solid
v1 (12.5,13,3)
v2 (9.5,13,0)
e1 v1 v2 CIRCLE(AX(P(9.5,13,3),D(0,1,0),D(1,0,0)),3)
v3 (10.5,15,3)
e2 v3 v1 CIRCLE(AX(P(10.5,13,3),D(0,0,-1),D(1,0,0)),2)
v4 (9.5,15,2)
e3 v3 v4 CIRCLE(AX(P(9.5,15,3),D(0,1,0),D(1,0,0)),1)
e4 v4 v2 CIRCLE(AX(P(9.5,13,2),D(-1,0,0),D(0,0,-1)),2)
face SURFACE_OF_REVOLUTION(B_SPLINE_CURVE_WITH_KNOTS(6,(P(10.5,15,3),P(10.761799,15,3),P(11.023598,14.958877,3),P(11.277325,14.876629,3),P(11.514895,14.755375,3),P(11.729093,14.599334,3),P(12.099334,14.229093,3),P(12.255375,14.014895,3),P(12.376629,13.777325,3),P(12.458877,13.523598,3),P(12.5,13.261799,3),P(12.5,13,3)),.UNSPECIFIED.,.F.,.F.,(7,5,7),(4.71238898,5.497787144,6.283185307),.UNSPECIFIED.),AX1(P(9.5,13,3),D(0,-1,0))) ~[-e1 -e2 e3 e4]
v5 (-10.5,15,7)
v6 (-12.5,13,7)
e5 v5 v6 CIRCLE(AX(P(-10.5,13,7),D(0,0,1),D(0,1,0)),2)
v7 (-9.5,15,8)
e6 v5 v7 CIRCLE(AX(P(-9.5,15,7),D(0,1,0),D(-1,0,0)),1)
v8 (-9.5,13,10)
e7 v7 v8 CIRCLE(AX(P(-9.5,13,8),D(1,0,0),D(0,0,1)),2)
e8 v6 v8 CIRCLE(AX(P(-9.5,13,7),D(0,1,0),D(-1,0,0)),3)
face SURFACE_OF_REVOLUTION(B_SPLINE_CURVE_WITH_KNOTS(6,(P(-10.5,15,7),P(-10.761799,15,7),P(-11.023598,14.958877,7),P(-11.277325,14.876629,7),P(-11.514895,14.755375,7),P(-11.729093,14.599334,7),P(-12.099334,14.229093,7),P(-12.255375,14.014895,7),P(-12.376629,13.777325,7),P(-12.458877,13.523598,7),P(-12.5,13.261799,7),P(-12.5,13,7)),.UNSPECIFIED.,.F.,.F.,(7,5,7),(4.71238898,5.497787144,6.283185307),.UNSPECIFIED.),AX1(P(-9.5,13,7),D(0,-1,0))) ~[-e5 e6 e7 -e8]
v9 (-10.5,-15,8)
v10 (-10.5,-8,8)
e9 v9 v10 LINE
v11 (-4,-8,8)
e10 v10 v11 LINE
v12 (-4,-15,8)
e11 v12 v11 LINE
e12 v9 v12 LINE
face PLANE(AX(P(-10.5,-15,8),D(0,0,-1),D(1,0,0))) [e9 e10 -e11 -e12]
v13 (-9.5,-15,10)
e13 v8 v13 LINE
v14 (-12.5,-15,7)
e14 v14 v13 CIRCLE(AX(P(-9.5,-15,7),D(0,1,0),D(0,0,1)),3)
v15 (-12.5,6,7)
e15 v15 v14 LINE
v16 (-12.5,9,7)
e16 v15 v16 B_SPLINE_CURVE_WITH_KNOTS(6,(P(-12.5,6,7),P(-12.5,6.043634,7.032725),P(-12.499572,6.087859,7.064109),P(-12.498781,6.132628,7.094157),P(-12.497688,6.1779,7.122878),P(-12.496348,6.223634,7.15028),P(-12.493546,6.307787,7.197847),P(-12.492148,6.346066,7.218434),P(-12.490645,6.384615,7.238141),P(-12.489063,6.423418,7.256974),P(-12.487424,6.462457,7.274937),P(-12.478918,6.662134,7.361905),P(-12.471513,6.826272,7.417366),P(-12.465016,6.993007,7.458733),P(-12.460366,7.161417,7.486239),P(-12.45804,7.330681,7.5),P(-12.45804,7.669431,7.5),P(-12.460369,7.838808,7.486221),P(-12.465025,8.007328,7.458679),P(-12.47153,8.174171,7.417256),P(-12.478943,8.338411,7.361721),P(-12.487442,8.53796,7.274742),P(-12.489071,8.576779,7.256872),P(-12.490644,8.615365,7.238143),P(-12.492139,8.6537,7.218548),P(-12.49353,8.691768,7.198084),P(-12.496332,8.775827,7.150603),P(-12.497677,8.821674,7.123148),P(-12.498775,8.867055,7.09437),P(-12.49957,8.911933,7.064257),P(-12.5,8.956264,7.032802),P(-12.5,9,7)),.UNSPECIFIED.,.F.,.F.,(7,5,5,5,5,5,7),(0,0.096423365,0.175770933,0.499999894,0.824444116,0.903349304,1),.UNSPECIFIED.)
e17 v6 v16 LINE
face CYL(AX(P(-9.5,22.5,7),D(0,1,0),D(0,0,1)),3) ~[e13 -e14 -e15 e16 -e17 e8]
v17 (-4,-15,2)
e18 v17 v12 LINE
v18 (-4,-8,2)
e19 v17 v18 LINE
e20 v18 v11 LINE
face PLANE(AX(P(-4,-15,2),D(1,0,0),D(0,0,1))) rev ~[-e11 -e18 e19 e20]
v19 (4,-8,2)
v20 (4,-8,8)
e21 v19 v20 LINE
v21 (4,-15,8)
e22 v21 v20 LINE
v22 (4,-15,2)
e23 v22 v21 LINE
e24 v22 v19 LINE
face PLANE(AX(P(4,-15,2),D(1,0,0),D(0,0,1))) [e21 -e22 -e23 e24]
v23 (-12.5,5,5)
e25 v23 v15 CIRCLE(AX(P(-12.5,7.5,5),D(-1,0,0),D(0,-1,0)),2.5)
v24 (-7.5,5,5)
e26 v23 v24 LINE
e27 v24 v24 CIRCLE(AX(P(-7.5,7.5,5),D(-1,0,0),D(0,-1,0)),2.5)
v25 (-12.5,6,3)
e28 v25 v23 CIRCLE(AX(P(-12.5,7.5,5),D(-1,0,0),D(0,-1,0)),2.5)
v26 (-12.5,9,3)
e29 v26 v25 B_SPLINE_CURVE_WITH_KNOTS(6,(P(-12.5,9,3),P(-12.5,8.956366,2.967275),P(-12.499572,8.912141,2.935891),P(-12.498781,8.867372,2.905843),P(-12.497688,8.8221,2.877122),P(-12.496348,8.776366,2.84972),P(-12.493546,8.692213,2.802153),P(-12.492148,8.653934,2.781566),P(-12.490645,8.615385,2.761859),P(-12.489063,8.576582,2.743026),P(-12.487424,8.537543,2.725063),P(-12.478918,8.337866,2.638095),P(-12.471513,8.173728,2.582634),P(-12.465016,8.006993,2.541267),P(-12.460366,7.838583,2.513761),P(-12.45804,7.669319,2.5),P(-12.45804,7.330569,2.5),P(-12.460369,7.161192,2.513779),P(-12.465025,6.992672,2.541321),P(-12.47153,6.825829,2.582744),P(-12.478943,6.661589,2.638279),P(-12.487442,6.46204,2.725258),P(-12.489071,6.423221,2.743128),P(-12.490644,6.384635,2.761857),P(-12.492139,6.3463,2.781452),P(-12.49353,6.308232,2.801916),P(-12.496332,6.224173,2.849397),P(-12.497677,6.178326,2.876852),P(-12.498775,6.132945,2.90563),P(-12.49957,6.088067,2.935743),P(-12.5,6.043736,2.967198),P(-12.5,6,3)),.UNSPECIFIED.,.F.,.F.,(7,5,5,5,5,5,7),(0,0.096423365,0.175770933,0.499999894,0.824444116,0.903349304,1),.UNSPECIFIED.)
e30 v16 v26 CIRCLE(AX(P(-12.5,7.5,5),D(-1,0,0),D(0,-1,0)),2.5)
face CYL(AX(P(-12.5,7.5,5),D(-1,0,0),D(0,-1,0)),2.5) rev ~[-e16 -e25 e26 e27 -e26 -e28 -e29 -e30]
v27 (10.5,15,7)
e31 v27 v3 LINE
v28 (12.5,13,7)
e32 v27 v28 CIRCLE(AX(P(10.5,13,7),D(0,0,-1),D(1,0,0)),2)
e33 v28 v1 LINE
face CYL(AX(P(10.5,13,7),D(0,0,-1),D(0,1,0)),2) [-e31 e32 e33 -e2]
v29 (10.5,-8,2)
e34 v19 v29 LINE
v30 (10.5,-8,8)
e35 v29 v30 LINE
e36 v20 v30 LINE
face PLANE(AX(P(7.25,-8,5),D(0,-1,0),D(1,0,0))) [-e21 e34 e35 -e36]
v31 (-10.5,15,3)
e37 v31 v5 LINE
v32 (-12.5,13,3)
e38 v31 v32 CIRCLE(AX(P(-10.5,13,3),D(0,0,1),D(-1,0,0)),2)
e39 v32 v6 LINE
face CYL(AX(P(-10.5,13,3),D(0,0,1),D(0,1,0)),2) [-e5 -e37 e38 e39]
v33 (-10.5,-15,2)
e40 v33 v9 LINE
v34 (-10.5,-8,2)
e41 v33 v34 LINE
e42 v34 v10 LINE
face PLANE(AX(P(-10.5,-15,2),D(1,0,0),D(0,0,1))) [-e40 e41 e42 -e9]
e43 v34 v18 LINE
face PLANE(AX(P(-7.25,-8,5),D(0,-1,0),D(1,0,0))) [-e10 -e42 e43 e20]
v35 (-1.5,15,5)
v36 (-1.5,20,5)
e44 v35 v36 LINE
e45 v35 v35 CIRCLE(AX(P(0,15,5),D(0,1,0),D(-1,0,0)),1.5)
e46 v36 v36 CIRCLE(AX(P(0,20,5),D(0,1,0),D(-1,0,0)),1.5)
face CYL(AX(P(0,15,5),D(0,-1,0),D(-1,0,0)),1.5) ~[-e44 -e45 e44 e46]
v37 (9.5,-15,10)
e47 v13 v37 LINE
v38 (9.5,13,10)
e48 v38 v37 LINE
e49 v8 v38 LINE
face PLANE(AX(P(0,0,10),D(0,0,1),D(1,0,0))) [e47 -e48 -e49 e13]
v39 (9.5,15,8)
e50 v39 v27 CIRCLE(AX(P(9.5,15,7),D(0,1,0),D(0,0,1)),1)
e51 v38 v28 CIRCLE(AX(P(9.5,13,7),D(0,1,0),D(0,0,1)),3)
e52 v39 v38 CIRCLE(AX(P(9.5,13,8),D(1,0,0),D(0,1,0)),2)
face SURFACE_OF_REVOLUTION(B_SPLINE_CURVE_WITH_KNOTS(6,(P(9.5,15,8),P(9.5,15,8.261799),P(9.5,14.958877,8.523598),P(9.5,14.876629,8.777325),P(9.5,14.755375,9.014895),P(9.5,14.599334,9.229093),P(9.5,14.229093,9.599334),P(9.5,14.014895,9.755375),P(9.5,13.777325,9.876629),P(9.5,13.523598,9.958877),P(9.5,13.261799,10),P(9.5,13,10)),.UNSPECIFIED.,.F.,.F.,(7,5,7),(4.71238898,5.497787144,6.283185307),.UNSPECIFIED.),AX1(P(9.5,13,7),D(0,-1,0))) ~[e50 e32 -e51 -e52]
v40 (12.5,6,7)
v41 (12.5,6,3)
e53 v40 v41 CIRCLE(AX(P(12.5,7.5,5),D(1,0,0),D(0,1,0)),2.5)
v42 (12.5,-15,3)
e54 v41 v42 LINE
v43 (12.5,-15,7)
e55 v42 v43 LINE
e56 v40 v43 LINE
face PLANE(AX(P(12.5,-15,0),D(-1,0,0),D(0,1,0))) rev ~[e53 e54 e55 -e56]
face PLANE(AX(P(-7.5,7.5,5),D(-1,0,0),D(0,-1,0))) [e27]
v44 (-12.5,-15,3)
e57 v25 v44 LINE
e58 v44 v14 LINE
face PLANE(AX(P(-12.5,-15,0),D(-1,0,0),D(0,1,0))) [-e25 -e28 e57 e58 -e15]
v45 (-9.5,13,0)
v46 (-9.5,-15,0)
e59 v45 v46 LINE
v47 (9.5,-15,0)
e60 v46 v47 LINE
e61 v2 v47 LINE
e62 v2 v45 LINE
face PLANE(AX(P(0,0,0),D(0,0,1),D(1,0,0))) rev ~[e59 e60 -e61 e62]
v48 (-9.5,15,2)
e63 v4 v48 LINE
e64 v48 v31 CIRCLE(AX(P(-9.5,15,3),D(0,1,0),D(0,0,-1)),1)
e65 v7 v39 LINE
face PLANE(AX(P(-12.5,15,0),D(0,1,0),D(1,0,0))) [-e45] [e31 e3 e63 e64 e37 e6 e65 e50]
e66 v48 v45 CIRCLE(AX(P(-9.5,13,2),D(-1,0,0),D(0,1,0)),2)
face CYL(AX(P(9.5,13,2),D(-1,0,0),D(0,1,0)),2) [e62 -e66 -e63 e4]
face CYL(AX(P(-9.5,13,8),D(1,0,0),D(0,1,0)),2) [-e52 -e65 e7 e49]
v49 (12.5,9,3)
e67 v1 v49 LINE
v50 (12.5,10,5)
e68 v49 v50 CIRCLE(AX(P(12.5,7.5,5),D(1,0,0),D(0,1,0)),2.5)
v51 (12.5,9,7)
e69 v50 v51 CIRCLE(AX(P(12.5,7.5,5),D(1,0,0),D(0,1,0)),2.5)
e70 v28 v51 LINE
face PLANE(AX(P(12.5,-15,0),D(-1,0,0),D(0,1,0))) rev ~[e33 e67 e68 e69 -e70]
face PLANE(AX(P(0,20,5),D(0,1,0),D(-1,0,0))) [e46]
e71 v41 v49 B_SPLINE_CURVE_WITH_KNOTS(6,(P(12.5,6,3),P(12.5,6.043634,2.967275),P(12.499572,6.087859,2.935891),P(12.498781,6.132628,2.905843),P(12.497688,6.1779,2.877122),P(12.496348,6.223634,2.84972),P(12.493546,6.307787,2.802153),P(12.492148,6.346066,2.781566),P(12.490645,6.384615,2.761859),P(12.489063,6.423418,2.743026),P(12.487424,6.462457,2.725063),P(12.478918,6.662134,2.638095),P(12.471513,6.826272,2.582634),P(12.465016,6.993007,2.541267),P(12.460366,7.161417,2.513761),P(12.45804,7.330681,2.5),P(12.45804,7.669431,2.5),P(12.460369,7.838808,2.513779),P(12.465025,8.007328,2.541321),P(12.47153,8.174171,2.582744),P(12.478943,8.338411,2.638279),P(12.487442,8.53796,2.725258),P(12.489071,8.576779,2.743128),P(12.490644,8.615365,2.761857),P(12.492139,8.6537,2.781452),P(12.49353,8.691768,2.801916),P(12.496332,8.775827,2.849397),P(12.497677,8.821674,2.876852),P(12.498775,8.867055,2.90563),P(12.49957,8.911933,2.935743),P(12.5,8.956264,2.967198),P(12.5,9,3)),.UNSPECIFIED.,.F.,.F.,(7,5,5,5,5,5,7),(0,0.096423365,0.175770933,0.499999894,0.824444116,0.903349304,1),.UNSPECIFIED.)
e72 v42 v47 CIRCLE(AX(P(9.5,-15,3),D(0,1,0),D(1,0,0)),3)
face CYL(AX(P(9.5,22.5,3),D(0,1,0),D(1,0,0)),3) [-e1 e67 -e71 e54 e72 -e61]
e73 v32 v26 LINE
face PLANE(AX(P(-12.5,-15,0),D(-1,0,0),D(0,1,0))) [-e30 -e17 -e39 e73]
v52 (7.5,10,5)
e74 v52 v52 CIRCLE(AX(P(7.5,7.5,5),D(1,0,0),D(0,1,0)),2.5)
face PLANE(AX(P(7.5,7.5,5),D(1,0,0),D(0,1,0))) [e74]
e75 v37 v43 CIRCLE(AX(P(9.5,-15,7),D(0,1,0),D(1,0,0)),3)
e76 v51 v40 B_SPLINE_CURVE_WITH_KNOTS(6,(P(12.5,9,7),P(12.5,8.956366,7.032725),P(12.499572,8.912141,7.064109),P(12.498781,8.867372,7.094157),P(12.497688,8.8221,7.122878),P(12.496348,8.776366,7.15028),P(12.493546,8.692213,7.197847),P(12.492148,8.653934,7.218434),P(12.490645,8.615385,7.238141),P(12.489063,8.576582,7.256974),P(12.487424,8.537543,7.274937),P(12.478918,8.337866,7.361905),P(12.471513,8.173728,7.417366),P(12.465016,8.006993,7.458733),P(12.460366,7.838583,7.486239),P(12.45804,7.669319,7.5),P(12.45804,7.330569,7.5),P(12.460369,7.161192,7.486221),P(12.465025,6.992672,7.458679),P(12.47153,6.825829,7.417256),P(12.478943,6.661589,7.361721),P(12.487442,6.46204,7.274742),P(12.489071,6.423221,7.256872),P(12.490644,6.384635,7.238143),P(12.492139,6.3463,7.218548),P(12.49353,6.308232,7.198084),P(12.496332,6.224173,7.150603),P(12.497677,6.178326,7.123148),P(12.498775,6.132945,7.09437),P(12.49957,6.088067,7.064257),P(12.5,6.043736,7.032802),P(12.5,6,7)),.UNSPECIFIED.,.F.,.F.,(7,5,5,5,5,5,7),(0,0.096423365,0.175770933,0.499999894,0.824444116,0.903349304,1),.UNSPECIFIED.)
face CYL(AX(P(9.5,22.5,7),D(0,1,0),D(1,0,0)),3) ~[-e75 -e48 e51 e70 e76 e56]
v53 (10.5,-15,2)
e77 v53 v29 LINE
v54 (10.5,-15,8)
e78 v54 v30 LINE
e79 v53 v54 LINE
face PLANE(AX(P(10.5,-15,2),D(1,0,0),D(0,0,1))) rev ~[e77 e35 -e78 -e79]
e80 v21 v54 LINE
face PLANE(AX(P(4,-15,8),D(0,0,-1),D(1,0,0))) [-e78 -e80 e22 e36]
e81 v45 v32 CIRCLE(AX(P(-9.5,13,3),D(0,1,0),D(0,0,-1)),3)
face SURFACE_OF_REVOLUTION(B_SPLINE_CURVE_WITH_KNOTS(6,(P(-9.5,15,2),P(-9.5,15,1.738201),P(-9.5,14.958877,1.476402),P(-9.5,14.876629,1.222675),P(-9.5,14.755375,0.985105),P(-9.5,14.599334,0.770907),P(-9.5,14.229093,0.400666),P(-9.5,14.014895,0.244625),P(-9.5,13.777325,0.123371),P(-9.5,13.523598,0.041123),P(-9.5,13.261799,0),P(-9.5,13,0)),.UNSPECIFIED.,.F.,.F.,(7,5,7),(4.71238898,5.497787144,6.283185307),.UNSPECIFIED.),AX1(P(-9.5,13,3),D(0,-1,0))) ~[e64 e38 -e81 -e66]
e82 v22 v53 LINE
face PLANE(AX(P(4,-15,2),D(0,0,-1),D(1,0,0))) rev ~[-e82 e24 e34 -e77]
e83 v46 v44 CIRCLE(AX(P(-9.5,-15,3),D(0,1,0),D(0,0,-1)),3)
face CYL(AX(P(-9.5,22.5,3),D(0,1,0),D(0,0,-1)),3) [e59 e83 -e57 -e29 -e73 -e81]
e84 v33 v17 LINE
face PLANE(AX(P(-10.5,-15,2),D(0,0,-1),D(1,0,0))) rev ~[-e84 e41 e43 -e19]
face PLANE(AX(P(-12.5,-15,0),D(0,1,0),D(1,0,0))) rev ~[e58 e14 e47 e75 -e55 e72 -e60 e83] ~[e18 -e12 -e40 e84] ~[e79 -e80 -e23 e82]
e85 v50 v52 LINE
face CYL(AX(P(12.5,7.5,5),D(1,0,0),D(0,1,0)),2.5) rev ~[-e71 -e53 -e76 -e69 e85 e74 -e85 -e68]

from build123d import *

# Parameters (mm, degrees)
F0_W         = 25
F0_H         = 30
F1_DEPTH     = 10
F2_R         = 1.5
F3_DEPTH     = 5
F4_R         = 2.5
F5_DEPTH     = 5
F6_R         = 2.5
F7_DEPTH     = 5
F8_W         = 6.5
F8_H         = 6
F9_DEPTH     = 7
F10_T1_DEPTH = 45
F11_R        = 2


# Not quite as in the source:
# - a fillet or chamfer that OpenCascade refuses, or shapes differently, is made with other operations: its cross-section is extruded or revolved along the edge and cut away or added


with BuildPart() as f1:
    # F0 (on Top) → F1 (new body)
    with BuildSketch(Plane.XY):
        Rectangle(F0_W, F0_H)
    extrude(amount=F1_DEPTH)

    # F2 (on face) → F3 (join)
    with BuildSketch(Plane(origin=(0, 15, 0), x_dir=(-1, 0, 0), z_dir=(0, 1, 0))):
        with Locations((0, 5)):
            Circle(F2_R)
    extrude(amount=F3_DEPTH)

    # F4 (on face) → F5 (cut)
    with BuildSketch(Plane.YZ.offset(12.5)):
        with Locations((7.5, 5)):
            Circle(F4_R)
    extrude(amount=-F5_DEPTH, mode=Mode.SUBTRACT)

    # F6 (on face) → F7 (cut)
    with BuildSketch(Plane(origin=(-12.5, 0, 0), x_dir=(0, -1, 0), z_dir=(-1, 0, 0))):
        with Locations((-7.5, 5)):
            Circle(F6_R)
    extrude(amount=-F7_DEPTH, mode=Mode.SUBTRACT)

    # F8 (on face) → F9 (cut)
    with BuildSketch(Plane.XZ.offset(15)):
        with Locations((7.25, 5)):
            Rectangle(F8_W, F8_H)
        with Locations((-7.25, 5)):
            Rectangle(F8_W, F8_H)
    extrude(amount=-F9_DEPTH, mode=Mode.SUBTRACT)

    # F10: fillet of radius 3 on 4 edges, made by hand

    # F10_s2 → F10_t1 (cut)
    with BuildSketch(Plane.XZ.offset(-22.5)):
        with BuildLine():
            ThreePointArc((-9.5, 10), (-11.6213203436, 9.1213203436), (-12.5, 7))
            Line((-12.5, 7), (-12.5, 10))
            Line((-12.5, 10), (-9.5, 10))
        make_face()
        with BuildLine():
            ThreePointArc((12.5, 7), (11.6213203436, 9.1213203436), (9.5, 10))
            Line((9.5, 10), (12.5, 10))
            Line((12.5, 10), (12.5, 7))
        make_face()
        with BuildLine():
            ThreePointArc((12.5, 3), (11.6213203436, 0.8786796564), (9.5, 0))
            Line((9.5, 0), (12.5, 0))
            Line((12.5, 0), (12.5, 3))
        make_face()
        with BuildLine():
            ThreePointArc((-9.5, 0), (-11.6213203436, 0.8786796564), (-12.5, 3))
            Line((-12.5, 3), (-12.5, 0))
            Line((-12.5, 0), (-9.5, 0))
        make_face()
    extrude(amount=F10_T1_DEPTH, mode=Mode.SUBTRACT)

    # F11
    f11_edges = [f1.edges().sort_by_distance(p)[0] for p in [
        (11.62132, 15, 0.87868),
        (12.5, 15, 5),
        (11.62132, 15, 9.12132),
        (0, 15, 0),
        (-11.62132, 15, 0.87868),
        (-12.5, 15, 5),
        (-11.62132, 15, 9.12132),
        (0, 15, 10),
    ]]
    fillet(f11_edges, radius=F11_R)


solid = f1.part
